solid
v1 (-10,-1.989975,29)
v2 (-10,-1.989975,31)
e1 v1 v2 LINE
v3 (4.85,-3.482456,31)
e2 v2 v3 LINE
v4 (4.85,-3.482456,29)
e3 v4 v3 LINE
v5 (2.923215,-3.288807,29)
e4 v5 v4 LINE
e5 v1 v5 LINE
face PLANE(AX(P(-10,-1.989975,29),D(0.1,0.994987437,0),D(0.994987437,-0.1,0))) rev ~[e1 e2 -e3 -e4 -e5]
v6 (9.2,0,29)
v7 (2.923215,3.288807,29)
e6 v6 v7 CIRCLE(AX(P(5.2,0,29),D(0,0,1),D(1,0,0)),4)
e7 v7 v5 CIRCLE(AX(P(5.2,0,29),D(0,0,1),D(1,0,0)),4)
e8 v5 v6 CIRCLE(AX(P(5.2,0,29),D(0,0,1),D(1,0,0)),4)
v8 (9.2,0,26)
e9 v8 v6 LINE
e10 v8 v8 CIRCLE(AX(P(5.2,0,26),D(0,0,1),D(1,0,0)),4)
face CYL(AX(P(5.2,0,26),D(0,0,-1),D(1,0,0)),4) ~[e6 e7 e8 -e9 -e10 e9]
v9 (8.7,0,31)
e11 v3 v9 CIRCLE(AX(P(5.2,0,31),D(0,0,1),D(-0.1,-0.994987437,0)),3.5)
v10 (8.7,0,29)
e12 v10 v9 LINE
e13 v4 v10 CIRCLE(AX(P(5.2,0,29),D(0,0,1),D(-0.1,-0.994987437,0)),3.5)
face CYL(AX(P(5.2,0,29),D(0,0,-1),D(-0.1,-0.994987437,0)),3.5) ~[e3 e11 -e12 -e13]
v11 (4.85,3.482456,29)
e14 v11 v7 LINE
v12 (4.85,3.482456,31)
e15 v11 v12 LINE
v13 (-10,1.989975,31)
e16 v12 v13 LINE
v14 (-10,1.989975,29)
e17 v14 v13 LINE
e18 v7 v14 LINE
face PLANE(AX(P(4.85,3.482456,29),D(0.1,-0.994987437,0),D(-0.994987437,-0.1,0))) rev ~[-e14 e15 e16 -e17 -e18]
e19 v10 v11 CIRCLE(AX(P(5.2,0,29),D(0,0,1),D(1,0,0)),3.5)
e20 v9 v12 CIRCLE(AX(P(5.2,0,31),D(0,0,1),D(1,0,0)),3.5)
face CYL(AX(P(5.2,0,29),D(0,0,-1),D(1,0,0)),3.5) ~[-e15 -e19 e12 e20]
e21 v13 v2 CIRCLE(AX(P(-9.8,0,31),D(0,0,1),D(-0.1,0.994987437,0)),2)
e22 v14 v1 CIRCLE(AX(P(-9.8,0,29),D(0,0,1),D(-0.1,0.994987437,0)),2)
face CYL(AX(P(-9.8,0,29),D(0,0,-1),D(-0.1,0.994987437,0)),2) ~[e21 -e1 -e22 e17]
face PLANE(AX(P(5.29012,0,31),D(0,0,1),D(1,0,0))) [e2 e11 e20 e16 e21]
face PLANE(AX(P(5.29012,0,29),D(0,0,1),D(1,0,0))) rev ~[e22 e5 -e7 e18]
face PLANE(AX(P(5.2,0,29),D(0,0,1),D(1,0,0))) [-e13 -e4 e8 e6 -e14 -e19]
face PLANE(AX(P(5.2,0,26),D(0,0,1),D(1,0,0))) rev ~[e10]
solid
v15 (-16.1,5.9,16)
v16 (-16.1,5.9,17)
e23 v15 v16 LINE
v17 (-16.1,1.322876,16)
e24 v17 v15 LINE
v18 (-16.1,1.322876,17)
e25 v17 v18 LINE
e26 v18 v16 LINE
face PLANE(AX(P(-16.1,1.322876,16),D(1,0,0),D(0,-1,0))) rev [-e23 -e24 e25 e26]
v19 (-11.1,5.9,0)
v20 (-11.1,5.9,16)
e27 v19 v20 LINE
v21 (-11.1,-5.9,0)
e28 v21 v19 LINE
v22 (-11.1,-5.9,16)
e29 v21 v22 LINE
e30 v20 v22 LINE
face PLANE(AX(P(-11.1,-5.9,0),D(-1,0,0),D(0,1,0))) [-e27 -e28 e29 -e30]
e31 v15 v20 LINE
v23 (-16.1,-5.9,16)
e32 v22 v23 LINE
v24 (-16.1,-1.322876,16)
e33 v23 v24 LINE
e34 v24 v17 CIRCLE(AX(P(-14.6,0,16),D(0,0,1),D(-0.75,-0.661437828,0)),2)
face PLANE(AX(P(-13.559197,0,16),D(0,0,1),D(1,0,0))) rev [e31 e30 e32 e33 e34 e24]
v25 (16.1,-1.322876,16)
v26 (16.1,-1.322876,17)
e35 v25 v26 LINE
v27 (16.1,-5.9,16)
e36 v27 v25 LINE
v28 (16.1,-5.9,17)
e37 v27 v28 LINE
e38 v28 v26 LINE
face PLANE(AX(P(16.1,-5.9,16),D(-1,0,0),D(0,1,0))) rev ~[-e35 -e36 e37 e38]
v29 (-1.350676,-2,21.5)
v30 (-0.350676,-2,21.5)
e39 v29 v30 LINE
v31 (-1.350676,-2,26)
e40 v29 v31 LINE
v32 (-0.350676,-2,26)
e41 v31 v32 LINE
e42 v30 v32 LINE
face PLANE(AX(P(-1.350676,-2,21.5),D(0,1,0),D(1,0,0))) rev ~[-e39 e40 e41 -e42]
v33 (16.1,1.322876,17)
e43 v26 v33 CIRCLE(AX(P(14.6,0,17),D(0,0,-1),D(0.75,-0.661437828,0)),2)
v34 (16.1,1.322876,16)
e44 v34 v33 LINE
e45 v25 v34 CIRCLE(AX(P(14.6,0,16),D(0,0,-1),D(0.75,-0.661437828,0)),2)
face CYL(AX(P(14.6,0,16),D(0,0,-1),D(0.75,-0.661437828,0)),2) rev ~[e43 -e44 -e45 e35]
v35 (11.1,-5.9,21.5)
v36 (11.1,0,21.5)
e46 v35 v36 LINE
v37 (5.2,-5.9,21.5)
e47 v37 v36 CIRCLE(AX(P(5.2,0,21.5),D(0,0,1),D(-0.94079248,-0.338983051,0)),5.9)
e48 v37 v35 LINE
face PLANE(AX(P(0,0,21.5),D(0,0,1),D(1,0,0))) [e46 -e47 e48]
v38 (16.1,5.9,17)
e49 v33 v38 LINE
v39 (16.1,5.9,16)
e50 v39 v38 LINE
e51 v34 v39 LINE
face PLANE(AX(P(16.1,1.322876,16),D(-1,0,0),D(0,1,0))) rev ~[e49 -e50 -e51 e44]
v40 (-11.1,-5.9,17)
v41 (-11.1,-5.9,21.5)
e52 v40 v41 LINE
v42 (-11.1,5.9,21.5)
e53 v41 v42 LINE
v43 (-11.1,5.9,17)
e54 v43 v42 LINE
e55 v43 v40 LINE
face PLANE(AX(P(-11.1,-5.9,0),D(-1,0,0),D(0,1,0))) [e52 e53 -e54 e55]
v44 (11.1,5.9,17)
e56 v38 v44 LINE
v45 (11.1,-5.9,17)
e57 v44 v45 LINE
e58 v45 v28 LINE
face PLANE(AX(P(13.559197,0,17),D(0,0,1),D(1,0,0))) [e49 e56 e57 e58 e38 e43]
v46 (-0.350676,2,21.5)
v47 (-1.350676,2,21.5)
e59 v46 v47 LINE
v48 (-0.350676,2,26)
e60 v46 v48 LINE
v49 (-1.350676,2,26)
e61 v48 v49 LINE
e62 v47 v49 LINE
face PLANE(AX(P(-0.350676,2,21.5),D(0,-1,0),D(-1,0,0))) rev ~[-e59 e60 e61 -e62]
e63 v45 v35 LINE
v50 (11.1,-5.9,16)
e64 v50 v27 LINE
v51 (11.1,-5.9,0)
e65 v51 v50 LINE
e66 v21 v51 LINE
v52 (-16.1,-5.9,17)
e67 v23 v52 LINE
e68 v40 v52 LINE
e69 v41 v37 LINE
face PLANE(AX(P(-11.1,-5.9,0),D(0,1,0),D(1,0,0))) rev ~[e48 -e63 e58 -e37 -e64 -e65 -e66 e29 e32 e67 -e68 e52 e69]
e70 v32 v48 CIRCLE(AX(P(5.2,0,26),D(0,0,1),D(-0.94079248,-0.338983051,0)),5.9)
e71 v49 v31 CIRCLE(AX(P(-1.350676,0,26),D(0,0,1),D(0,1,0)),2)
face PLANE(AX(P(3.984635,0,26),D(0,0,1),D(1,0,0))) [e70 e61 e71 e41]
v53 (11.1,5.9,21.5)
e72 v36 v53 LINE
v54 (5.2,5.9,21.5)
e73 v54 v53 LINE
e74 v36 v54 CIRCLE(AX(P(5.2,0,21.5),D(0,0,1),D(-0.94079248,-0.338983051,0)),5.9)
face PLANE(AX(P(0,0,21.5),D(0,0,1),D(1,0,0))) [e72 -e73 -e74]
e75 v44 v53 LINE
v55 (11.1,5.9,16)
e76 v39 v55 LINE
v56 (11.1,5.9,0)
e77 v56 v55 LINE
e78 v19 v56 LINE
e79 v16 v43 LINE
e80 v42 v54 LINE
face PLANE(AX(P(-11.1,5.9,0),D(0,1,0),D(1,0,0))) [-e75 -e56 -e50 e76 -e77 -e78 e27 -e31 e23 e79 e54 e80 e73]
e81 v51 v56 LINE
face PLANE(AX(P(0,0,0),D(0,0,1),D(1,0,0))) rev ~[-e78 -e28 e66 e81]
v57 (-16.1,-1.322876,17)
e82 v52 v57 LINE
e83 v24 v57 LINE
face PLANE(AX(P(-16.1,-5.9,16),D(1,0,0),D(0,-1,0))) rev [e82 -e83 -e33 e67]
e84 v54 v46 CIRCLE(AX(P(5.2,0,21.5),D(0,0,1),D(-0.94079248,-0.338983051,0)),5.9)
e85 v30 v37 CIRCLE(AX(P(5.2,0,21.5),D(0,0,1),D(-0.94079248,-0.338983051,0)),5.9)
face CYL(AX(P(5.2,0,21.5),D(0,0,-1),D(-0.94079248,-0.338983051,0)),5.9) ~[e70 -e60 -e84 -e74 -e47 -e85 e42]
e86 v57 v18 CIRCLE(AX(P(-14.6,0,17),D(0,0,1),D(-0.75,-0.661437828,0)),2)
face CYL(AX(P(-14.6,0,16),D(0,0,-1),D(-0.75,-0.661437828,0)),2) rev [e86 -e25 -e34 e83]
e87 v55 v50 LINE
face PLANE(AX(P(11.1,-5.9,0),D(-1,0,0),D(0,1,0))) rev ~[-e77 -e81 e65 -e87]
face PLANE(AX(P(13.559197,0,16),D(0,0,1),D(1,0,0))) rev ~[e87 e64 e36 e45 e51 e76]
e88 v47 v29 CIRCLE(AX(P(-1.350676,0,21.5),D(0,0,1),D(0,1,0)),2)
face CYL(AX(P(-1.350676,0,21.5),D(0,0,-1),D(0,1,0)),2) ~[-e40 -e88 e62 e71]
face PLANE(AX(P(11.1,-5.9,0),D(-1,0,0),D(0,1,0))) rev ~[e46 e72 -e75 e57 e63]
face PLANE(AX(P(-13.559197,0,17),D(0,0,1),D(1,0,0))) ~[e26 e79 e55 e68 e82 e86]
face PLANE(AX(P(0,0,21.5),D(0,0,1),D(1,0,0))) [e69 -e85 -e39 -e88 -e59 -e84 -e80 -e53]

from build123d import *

# Parameters (mm, degrees)
F0_W      = 22.2
F0_H      = 11.8
F1_DEPTH  = 21.5
F5_DEPTH  = 4.5
F6_DEPTH  = 1
F7_R      = 4
F8_DEPTH  = 3
F10_DEPTH = 2


# Not quite as in the source:
# - a pattern or mirror of a feature is missing from the dataset's text; its kind, count and spacing are read off the source's solid


with BuildPart() as f1:
    # F0 (on Top) → F1 (new body)
    with BuildSketch(Plane.XY):
        Rectangle(F0_W, F0_H)
    extrude(amount=F1_DEPTH)

    # F4 (on face) → F5 (join)
    with BuildSketch(Plane.XY.offset(21.5)):
        with BuildLine():
            Line((-1.3506756346, -2), (-0.3506756346, -2))
            ThreePointArc((-0.3506756346, -2), (11.1, 0), (-0.3506756346, 2))
            Line((-0.3506756346, 2), (-1.3506756346, 2))
            ThreePointArc((-1.3506756346, 2), (-3.3506756346, 0), (-1.3506756346, -2))
        make_face()
    extrude(amount=F5_DEPTH)

    # F3 (on offset) → F6 (join)
    with BuildSketch(Plane.XY.offset(16)):
        with BuildLine():
            Line((16.1, 5.9), (11.1, 5.9))
            Line((11.1, 5.9), (11.1, -5.9))
            Line((11.1, -5.9), (16.1, -5.9))
            Line((16.1, -5.9), (16.1, -1.3228756555))
            ThreePointArc((16.1, -1.3228756555), (12.6, 0), (16.1, 1.3228756555))
            Line((16.1, 1.3228756555), (16.1, 5.9))
        make_face()
    f6 = extrude(amount=F6_DEPTH)

    # F6_copies: F6 across plane
    add(f6.mirror(Plane(origin=(0, 0, 0), x_dir=(0, 0, -1), z_dir=(-1, 0, 0))))


with BuildPart() as f8:
    # F7 (on face) → F8 (new body)
    with BuildSketch(Plane.XY.offset(26)):
        with Locations((5.2, 0)):
            Circle(F7_R)
    extrude(amount=F8_DEPTH)

    # F9 (on face) → F10 (join)
    with BuildSketch(Plane.XY.offset(29)):
        with BuildLine():
            ThreePointArc((4.85, -3.4824560299), (7.5478713764, -2.5956694705), (8.7, 0))
            ThreePointArc((8.7, 0), (7.5478713764, 2.5956694705), (4.85, 3.4824560299))
            ThreePointArc((4.85, 3.4824560299), (1.7, 0), (4.85, -3.4824560299))
        make_face()
        with BuildLine():
            ThreePointArc((4.85, -3.4824560299), (1.7, 0), (4.85, 3.4824560299))
            Line((4.85, 3.4824560299), (-10, 1.9899748742))
            ThreePointArc((-10, 1.9899748742), (-11.8, 0), (-10, -1.9899748742))
            Line((-10, -1.9899748742), (4.85, -3.4824560299))
        make_face()
    extrude(amount=F10_DEPTH)


solid = Compound([f1.part, f8.part])
